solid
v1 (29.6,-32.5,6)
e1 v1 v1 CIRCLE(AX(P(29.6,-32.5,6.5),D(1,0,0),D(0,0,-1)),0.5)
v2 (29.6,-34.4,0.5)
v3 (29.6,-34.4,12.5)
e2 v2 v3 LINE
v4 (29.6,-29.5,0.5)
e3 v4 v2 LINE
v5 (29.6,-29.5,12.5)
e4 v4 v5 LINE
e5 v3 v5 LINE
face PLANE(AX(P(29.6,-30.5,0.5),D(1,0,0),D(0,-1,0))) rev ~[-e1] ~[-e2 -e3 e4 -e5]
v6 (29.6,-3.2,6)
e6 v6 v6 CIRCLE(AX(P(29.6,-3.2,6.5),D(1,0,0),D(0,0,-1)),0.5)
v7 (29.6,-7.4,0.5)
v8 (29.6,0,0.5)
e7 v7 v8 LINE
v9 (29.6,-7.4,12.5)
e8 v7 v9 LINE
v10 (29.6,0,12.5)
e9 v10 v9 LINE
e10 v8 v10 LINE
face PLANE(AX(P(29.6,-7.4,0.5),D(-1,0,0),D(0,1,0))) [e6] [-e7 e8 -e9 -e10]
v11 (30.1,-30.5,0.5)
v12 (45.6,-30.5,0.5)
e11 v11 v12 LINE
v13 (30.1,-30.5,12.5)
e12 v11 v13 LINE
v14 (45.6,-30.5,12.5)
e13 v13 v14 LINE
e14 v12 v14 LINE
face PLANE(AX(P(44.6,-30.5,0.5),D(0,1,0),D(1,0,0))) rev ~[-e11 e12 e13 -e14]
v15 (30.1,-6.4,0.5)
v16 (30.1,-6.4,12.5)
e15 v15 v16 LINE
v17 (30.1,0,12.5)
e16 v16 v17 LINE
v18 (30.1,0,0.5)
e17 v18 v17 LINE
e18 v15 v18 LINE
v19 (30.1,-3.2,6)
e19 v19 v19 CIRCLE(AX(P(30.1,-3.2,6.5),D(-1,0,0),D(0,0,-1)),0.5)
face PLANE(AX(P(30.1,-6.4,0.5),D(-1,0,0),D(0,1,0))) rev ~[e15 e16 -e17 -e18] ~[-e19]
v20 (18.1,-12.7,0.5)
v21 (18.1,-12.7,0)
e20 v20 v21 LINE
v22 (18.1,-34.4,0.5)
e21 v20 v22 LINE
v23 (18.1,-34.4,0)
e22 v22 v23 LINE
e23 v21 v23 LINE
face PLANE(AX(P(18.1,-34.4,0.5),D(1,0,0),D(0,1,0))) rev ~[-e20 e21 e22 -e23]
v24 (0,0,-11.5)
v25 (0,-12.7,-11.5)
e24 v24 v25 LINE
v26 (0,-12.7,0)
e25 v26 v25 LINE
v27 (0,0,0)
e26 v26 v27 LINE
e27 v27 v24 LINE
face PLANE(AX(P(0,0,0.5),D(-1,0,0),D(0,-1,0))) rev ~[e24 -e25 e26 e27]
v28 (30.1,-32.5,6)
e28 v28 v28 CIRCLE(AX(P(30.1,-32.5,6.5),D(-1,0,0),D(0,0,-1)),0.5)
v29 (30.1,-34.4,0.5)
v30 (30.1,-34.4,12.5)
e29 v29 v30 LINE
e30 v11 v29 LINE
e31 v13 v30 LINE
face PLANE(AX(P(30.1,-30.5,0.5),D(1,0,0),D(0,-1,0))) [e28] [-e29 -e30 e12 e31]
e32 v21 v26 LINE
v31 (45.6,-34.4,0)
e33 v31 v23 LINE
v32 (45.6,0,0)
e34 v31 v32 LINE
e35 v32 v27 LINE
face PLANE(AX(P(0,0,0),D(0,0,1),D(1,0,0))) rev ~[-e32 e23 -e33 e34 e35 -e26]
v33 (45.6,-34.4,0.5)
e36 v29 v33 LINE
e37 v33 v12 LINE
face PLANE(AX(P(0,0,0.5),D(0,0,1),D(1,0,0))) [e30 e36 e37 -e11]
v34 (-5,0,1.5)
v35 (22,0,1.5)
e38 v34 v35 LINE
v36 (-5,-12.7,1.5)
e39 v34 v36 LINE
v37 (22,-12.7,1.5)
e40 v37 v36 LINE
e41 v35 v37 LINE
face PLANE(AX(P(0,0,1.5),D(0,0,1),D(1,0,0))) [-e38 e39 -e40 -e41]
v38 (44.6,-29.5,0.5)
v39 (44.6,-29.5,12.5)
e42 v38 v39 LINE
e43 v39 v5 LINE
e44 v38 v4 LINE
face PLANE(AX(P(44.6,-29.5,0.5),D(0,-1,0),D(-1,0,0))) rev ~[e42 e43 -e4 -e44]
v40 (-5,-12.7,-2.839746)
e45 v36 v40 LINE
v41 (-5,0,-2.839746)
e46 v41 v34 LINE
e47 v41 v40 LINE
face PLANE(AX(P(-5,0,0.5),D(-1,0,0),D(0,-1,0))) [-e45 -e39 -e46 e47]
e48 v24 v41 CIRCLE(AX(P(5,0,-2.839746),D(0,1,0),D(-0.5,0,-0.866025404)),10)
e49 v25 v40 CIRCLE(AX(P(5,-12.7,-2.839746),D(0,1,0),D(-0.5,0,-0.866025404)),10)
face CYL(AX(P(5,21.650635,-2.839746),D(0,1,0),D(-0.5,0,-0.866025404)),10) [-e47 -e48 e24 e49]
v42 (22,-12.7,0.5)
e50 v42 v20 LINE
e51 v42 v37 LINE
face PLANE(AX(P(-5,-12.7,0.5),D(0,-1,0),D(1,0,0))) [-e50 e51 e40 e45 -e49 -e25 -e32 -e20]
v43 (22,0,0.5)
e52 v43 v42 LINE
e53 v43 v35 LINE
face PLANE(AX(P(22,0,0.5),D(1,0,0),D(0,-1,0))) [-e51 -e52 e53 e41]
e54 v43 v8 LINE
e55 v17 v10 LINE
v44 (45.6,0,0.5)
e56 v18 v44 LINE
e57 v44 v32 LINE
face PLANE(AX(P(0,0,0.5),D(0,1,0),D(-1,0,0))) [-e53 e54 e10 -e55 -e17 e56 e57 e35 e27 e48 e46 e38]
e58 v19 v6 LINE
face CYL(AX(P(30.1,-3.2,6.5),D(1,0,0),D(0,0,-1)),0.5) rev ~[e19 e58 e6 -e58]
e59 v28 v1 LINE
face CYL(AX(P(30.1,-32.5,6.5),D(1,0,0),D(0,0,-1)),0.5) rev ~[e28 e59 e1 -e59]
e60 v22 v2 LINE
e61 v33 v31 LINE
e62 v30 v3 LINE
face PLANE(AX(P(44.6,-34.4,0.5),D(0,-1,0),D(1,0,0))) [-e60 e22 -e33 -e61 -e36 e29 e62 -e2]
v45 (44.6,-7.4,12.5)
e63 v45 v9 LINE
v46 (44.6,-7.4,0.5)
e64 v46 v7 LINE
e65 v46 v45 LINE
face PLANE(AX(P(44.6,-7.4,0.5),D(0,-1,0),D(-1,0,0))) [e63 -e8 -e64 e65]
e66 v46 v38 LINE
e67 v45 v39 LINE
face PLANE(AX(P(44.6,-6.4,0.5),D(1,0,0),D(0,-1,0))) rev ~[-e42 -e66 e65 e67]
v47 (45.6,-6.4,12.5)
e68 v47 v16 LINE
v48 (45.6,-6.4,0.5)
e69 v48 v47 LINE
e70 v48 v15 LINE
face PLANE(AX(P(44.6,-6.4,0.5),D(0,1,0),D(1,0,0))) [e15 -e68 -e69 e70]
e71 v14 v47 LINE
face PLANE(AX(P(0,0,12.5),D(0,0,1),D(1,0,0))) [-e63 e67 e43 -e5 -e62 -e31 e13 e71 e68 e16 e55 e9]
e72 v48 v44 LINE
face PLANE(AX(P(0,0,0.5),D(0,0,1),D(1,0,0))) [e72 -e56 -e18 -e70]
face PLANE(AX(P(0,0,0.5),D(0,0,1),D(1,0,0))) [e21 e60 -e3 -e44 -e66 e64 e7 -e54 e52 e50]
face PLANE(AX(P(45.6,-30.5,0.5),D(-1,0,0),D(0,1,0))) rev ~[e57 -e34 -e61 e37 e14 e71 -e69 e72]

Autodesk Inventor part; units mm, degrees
ref_plane "YZ Plane" through (0, 0, 0) normal (1, 0, 0) x (0, 1, 0)
ref_plane "XZ Plane" through (0, 0, 0) normal (0, 1, 0) x (-1, 0, 0)
ref_plane "XY Plane" through (0, 0, 0) normal (0, 0, 1) x (1, 0, 0)
sketch "Esboço1" plane through (0, 0, 0) normal (0, 0, 1) x (1, 0, 0)
  line L0 (0, 0) -> (50, 0)
  line L1 (50, 0) -> (50, -31.4)
  line L2 (50, -31.4) -> (0, -31.4)
  line L3 (0, -31.4) -> (0, 0)
  dimension "d0" = 50
  dimension "d1" = 31.4
extrude "Extrusão1" add sketch "Esboço1" along normal blind 0.5
sketch "Esboço2" plane through (0, 0, 0.5) normal (0, 0, 1) x (1, 0, 0)
  line L0 (0, -31.4) -> (50, -31.4) projected
  line L1 (50, -31.4) -> (43.6, -31.4)
  line L2 (43.6, -31.4) -> (43.6, 0)
  line L3 (50, 0) -> (0, 0) projected
  line L4 (43.6, 0) -> (50, 0)
  line L5 (50, -31.4) -> (50, 0) projected
  line L6 (50, 0) -> (50, -31.4)
  dimension "d4" = 6.4
extrude "Extrusão2" cut sketch "Esboço2" against normal blind 0.5
sketch "Esboço3" plane through (0, 0, 0.5) normal (0, 0, 1) x (1, 0, 0)
  line L0 (0, -31.4) -> (43.6, -31.4) projected
  line L1 (43.6, -31.4) -> (13.6, -31.4)
  line L2 (13.6, -31.4) -> (13.6, -34.4)
  line L3 (13.6, -34.4) -> (43.6, -34.4)
  line L4 (43.6, -34.4) -> (43.6, -31.4)
  point P0 (0, 0)
  dimension "d7" = 30
  dimension "d8" = 3
extrude "Extrusão3" add sketch "Esboço3" against normal blind 0.5
sketch "Esboço4" plane through (0, 0, 0.5) normal (0, 0, 1) x (1, 0, 0)
  line L0 (43.6, -34.4) -> (43.6, 0) projected
  line L1 (43.6, -34.4) -> (44.6, -34.4)
  line L2 (44.6, -34.4) -> (44.6, 0)
  line L3 (44.6, 0) -> (43.6, 0)
  line L4 (43.6, 0) -> (43.6, -34.4)
  point P0 (0, 0)
  dimension "d11" = 1
extrude "Extrusão4" add sketch "Esboço4" against normal blind 0.5
sketch "Esboço5" plane through (0, 0, 0.5) normal (0, 0, 1) x (1, 0, 0)
  line L0 (44.6, -34.4) -> (13.6, -34.4) projected
  line L1 (44.6, -34.4) -> (44.6, -29.5)
  line L2 (44.6, 0) -> (44.6, -34.4) projected
  line L3 (44.6, 0) -> (44.6, -7.4)
  line L4 (44.6, -7.4) -> (29.6, -7.4)
  line L5 (44.6, -29.5) -> (29.6, -29.5)
  line L6 (29.6, -29.5) -> (29.6, -30.5)
  line L7 (29.6, -30.5) -> (44.6, -30.5)
  line L8 (29.6, -7.4) -> (29.6, -6.4)
  line L9 (29.6, -6.4) -> (44.6, -6.4)
  line L10 (44.6, -7.4) -> (44.6, -6.4)
  line L11 (29.6, -6.4) -> (30.1, -6.4)
  line L12 (30.1, -6.4) -> (30.1, 0)
  line L13 (44.6, 0) -> (0, 0) projected
  line L14 (29.6, 0) -> (29.6, -6.4)
  line L15 (29.6, -30.5) -> (29.6, -34.4)
  line L16 (30.1, -30.5) -> (30.1, -34.4)
  line L17 (29.6, -34.4) -> (30.1, -34.4)
  dimension "d14" = 4.9
  dimension "d15" = 7.4
  dimension "d16" = 15
  dimension "d17" = 15
  dimension "d18" = 1
  dimension "d19" = 1
  dimension "d20" = 0.5
extrude "Extrusão5" add sketch "Esboço5" along normal blind 12 contours L0 L15 L7 L16 | L7 L6 L5 L1 | L2 L4 L8 L9 | L12 L9 L14 L13
sketch "Esboço6" plane through (0, 0, 0.5) normal (0, 0, 1) x (1, 0, 0)
  line L0 (44.6, -34.4) -> (44.6, -30.5) projected
  line L1 (44.6, -34.4) -> (45.6, -34.4)
  line L2 (45.6, -34.4) -> (45.6, 0)
  line L3 (45.6, 0) -> (44.6, 0)
  line L4 (44.6, 0) -> (44.6, -34.4)
  point P0 (0, 0)
  dimension "d23" = 1
extrude "Extrusão6" add sketch "Esboço6" against normal blind 0.5
sketch "Esboço7" plane through (0, 0, 0.5) normal (0, 0, 1) x (1, 0, 0)
  line L0 (44.6, -30.5) -> (30.1, -30.5) projected
  line L1 (44.6, -30.5) -> (45.6, -30.5)
  line L2 (45.6, -34.4) -> (45.6, 0) projected
  line L3 (45.6, -30.5) -> (45.6, -6.4)
  line L4 (30.1, -6.4) -> (44.6, -6.4) projected
  line L5 (44.6, -6.4) -> (45.6, -6.4)
  line L6 (44.6, -6.4) -> (44.6, -30.5)
  point P0 (0, 0)
extrude "Extrusão7" add sketch "Esboço7" along normal blind 12
sketch "Esboço8" plane through (0, 0, 0.5) normal (0, 0, 1) x (1, 0, 0)
  line L0 (29.6, -29.5) -> (29.6, -34.4) projected
  line L1 (29.6, -31.7209) -> (18.1, -31.7209)
  line L2 (18.1, -34.4) -> (18.1, -31.7209)
  line L3 (18.1, -31.7209) -> (18.1, -12.7)
  line L4 (18.1, -12.7) -> (0, -12.7)
  line L5 (0, 0) -> (0, -31.4) projected
  line L6 (18.1, -34.4) -> (0, -34.4)
  line L7 (0, -34.4) -> (0, -12.7)
  dimension "d28" = 11.5
extrude "Extrusão8" cut sketch "Esboço8" against normal blind 12
sketch "Esboço9" plane through (0, 0, 0.5) normal (0, 0, 1) x (1, 0, 0)
  line L0 (0, 0) -> (0, -12.7) projected
  line L1 (0, 0) -> (-5, 0)
  line L2 (-5, 0) -> (-5, -12.7)
  line L3 (-5, -12.7) -> (0, -12.7)
  line L4 (0, -12.7) -> (0, 0)
  dimension "d31" = 5
extrude "Extrusão9" add sketch "Esboço9" against normal blind 12
fillet "Arredondamento1" radius 10 1 edges at (-5, -6.35, -11.5)
sketch "Esboço10" plane through (0, 0, 0.5) normal (0, 0, 1) x (1, 0, 0)
  line L0 (-5, 0) -> (-5, -12.7) projected
  line L1 (-5, 0) -> (22, 0)
  line L2 (22, 0) -> (22, -12.7)
  line L3 (22, -12.7) -> (-5, -12.7)
  line L4 (-5, -12.7) -> (-5, 0)
  point P0 (0, 0)
  dimension "d37" = 27
extrude "Extrusão10" add sketch "Esboço10" along normal blind 1
sketch "Esboço11" plane through (30.1, -6.4, 0.5) normal (1, 0, 0) x (0, 0, -1)
  line L0 (0, 6.4) -> (-12, 6.4) projected
  line L1 (-12, 6.4) -> (-6, 6.4)
  line L2 (-6, 6.4) -> (-6, -28)
  line L3 (0, -28) -> (-12, -28) projected
  line L4 (-6, 6.4) -> (-6, 3.2)
  line L5 (-6, -28) -> (-6, -26.1)
  circle A0 centre (-6, -26.1) radius 0.5
  circle A1 centre (-6, 3.2) radius 0.5
  point P0 (0.5, 6.4)
  dimension "d38" = 3.2
  dimension "d39" = 1.9
  dimension "d40" = 1
  dimension "d41" = 1
extrude "Extrusão11" cut sketch "Esboço11" against normal blind 1
properties part number "tampa 2"
